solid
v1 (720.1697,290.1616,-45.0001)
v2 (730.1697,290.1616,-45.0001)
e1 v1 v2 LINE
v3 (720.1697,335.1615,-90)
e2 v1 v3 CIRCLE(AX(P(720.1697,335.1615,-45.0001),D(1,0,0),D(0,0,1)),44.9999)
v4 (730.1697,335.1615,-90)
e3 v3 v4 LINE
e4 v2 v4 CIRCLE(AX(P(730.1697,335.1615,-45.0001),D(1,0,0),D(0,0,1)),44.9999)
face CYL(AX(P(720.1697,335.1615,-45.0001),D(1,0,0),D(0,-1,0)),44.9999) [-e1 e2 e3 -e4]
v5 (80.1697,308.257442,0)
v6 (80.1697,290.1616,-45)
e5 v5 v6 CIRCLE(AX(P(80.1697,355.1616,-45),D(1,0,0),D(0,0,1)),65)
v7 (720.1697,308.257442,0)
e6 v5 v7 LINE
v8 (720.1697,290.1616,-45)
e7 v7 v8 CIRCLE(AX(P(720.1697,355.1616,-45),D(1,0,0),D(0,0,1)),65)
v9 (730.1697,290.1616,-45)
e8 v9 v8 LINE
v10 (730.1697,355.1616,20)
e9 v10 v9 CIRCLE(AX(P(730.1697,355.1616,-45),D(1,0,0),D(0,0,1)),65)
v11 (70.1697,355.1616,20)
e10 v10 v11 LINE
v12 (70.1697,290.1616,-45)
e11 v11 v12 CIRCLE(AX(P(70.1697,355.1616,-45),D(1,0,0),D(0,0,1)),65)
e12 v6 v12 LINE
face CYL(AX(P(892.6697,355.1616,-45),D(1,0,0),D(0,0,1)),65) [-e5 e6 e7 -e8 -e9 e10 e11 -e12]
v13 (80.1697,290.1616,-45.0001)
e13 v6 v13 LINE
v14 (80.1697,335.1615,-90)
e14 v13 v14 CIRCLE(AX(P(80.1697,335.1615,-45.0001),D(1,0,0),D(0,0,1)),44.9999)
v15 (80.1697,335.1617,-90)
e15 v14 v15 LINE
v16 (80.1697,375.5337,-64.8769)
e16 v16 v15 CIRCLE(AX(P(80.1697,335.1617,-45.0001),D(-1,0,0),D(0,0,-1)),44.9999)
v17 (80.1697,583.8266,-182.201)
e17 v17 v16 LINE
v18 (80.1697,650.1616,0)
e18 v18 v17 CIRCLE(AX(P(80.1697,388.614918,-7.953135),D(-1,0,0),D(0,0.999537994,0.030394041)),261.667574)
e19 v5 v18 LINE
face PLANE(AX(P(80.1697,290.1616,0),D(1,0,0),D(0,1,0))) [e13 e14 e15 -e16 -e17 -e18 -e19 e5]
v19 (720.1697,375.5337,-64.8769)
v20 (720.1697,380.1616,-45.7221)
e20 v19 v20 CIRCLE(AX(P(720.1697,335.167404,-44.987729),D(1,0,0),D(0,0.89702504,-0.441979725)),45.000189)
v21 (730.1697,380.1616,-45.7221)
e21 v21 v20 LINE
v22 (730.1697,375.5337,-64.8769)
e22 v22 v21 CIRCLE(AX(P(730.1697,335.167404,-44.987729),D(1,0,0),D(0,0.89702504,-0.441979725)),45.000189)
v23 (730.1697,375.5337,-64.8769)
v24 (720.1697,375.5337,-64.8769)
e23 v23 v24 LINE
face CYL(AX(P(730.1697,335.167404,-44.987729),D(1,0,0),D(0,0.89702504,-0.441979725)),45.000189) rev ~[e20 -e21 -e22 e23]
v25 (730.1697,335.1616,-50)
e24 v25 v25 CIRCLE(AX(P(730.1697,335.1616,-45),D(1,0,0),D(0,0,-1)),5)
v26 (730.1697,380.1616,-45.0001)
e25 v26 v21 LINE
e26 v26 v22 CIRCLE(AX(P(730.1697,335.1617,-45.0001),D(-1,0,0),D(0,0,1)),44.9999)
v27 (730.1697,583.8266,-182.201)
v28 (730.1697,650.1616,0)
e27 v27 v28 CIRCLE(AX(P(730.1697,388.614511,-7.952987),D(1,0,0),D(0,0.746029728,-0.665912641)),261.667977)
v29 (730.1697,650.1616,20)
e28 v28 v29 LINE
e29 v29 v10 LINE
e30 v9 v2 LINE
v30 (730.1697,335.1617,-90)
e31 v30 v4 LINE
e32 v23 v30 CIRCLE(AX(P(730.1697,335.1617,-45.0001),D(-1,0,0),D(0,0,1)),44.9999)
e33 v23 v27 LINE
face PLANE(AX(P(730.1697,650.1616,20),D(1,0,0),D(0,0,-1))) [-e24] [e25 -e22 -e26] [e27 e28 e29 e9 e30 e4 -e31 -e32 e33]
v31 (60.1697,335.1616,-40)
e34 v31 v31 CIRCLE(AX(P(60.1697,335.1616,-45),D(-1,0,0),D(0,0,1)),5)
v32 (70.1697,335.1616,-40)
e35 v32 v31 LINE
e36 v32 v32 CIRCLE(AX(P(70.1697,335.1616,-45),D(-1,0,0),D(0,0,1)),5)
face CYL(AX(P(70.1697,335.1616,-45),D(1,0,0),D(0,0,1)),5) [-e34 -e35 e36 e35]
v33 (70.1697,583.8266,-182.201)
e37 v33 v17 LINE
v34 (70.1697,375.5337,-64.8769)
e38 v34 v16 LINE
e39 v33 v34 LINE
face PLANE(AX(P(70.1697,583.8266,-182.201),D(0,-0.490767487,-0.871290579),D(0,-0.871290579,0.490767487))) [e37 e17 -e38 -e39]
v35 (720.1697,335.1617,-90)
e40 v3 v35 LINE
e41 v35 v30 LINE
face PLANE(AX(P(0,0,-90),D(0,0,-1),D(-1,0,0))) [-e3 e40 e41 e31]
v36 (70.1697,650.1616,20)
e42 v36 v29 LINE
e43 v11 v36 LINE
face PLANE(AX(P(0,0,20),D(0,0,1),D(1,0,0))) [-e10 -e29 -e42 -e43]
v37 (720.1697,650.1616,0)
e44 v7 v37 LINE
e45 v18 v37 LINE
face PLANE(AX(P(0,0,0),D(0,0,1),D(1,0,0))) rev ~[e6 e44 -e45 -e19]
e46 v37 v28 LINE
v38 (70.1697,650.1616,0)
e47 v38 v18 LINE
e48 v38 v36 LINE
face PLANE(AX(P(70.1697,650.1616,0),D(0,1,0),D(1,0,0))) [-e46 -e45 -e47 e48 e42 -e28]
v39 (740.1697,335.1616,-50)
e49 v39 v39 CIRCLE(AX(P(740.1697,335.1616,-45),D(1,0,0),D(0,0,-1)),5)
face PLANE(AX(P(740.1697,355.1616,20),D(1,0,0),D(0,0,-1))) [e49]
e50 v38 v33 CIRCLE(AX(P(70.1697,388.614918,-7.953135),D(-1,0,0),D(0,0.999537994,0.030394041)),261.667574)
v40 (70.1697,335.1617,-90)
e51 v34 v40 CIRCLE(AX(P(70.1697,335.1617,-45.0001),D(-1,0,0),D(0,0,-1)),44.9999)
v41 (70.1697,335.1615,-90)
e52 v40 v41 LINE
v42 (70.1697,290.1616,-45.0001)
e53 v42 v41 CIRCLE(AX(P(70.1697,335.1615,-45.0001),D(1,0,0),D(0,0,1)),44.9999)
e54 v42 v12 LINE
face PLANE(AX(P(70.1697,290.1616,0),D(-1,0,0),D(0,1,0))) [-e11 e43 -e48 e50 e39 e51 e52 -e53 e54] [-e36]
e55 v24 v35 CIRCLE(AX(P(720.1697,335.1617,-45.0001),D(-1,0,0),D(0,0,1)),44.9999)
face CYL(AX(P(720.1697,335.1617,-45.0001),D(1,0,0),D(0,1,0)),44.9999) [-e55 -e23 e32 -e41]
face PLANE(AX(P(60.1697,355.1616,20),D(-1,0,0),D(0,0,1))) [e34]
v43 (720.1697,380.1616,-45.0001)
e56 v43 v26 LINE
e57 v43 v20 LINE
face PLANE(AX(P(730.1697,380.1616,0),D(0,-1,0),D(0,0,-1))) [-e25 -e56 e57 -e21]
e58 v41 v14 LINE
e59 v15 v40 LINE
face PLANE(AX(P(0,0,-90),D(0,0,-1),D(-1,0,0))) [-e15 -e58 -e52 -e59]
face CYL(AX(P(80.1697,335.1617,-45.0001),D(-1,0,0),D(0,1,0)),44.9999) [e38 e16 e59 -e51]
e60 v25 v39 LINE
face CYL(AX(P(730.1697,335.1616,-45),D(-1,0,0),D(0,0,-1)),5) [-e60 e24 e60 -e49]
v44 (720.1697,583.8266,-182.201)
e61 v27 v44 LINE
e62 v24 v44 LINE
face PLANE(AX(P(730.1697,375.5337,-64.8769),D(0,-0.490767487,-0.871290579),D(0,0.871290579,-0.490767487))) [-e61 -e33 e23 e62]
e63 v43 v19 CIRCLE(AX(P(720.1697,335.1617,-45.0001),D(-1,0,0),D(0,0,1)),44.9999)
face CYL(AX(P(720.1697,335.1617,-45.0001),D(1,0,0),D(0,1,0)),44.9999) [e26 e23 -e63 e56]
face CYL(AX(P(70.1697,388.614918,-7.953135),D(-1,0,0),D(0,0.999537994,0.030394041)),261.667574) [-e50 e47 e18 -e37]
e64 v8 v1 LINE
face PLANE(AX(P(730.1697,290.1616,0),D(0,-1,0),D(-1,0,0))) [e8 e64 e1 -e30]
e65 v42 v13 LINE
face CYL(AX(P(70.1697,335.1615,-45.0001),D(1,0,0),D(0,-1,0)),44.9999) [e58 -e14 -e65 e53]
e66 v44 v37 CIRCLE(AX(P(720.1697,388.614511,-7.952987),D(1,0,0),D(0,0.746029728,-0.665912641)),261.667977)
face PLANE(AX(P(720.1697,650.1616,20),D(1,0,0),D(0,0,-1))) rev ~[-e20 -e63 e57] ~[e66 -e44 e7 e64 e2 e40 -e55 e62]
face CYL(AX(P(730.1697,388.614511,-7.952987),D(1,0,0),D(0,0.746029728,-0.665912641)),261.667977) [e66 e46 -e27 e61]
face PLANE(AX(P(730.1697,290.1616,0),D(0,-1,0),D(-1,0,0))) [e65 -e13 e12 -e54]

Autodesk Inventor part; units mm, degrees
ref_plane "YZ Plane" through (0, 0, 0) normal (1, 0, 0) x (0, 1, 0)
ref_plane "XZ Plane" through (0, 0, 0) normal (0, 1, 0) x (-1, 0, 0)
ref_plane "XY Plane" through (0, 0, 0) normal (0, 0, 1) x (1, 0, 0)
sketch "스케치1" plane through (0, 0, 0) normal (0, 0, 1) x (1, 0, 0)
  line L0 (70.1697, 650.1616) -> (730.1697, 650.1616)
  line L1 (730.1697, 650.1616) -> (730.1697, 290.1616)
  line L2 (730.1697, 290.1616) -> (70.1697, 290.1616)
  line L3 (70.1697, 290.1616) -> (70.1697, 650.1616)
  point P0 (0, 0)
  dimension "d0" = 660
  dimension "d1" = 360
extrude "돌출1" add sketch "스케치1" along normal blind 20
sketch "스케치2" plane through (0, 0, 0) normal (0, 0, -1) x (-1, 0, 0)
  line L0 (-70.1697, 290.1616) -> (-730.1697, 290.1616) projected
  line L1 (-730.1697, 290.1616) -> (-720.1697, 290.1616)
  line L2 (-720.1697, 290.1616) -> (-720.1697, 380.1616)
  line L3 (-720.1697, 380.1616) -> (-730.1697, 380.1616)
  line L4 (-730.1697, 380.1616) -> (-730.1697, 290.1616)
  line L5 (-70.1697, 290.1616) -> (-80.1697, 290.1616)
  line L6 (-80.1697, 290.1616) -> (-80.1697, 380.1616)
  line L7 (-80.1697, 380.1616) -> (-70.1697, 380.1616)
  line L8 (-70.1697, 380.1616) -> (-70.1697, 290.1616)
  point P0 (0, 0)
  dimension "d4" = 10
  dimension "d5" = 90
  dimension "d6" = 10
  dimension "d7" = 90
extrude "돌출2" add sketch "스케치2" along normal blind 90
fillet "모깎기1" radius 45 4 edges at (75.1697, 380.1616, -90) (75.1697, 290.1616, -90) (725.1697, 380.1616, -90) (725.1697, 290.1616, -90)
fillet "모깎기2" radius 65 1 edges at (400.1697, 290.1616, 20)
sketch "스케치3" plane through (70.1697, 650.1616, 0) normal (-1, 0, 0) x (0, 0, 1)
  arc A0 (0, 0) -> (-182.201, -66.335) centre (-7.9531, -261.5469) ccw
  line L0 (-182.201, -66.335) -> (-64.8769, -274.6279)
  arc A1 (-45, -270) -> (-45, -360) centre (-45, -315) ccw projected
  line L1 (0, -270) -> (0, 0)
  line L2 (-45, -270) -> (0, -270)
  arc A2 (-45, -270) -> (-64.8769, -274.6279) centre (-45, -315) ccw
  point P0 (0, -650.1616)
extrude "돌출3" add sketch "스케치3" against normal blind 10
sketch "스케치4" plane through (730.1697, 650.1616, 20) normal (1, 0, 0) x (0, 0, -1)
  arc A0 (65, -360) -> (84.8769, -274.6279) centre (65, -315) ccw projected
  arc A1 (202.201, -66.335) -> (20, 0) centre (27.9531, -261.5469) ccw projected
  line L0 (84.8769, -274.6279) -> (202.201, -66.335)
  arc A2 (202.201, -66.335) -> (20, 0) centre (27.9531, -261.5469) ccw
  line L1 (20, 0) -> (0, 0) projected
  line L2 (20, -270) -> (20, -341.9042) projected
  line L3 (20, 0) -> (20, -270)
  line L4 (20, -270) -> (65.7221, -270)
  arc A3 (84.8769, -274.6279) -> (65.7221, -270) centre (64.9878, -314.994) ccw
  point P0 (20, -650.1616)
  dimension "d14" = 45
extrude "돌출4" add sketch "스케치4" against normal blind 10
sketch "스케치5" plane through (730.1697, 355.1616, 20) normal (1, 0, 0) x (0, 0, -1)
  arc A0 (65, -65) -> (84.8769, 20.3721) centre (65, -20) ccw projected
  circle A1 centre (65, -20) radius 5
  point P0 (20, -355.1616)
  dimension "d17" = 10
extrude "돌출5" add sketch "스케치5" along normal blind 10
sketch "스케치6" plane through (70.1697, 355.1616, 20) normal (-1, 0, 0) x (0, 0, 1)
  arc A0 (-84.8769, 20.3721) -> (-65, -65) centre (-65, -20) ccw projected
  circle A1 centre (-65, -20) radius 5
  point P0 (-20, -355.1616)
  dimension "d20" = 10
extrude "돌출6" add sketch "스케치6" along normal blind 10
properties part number "후눈"
